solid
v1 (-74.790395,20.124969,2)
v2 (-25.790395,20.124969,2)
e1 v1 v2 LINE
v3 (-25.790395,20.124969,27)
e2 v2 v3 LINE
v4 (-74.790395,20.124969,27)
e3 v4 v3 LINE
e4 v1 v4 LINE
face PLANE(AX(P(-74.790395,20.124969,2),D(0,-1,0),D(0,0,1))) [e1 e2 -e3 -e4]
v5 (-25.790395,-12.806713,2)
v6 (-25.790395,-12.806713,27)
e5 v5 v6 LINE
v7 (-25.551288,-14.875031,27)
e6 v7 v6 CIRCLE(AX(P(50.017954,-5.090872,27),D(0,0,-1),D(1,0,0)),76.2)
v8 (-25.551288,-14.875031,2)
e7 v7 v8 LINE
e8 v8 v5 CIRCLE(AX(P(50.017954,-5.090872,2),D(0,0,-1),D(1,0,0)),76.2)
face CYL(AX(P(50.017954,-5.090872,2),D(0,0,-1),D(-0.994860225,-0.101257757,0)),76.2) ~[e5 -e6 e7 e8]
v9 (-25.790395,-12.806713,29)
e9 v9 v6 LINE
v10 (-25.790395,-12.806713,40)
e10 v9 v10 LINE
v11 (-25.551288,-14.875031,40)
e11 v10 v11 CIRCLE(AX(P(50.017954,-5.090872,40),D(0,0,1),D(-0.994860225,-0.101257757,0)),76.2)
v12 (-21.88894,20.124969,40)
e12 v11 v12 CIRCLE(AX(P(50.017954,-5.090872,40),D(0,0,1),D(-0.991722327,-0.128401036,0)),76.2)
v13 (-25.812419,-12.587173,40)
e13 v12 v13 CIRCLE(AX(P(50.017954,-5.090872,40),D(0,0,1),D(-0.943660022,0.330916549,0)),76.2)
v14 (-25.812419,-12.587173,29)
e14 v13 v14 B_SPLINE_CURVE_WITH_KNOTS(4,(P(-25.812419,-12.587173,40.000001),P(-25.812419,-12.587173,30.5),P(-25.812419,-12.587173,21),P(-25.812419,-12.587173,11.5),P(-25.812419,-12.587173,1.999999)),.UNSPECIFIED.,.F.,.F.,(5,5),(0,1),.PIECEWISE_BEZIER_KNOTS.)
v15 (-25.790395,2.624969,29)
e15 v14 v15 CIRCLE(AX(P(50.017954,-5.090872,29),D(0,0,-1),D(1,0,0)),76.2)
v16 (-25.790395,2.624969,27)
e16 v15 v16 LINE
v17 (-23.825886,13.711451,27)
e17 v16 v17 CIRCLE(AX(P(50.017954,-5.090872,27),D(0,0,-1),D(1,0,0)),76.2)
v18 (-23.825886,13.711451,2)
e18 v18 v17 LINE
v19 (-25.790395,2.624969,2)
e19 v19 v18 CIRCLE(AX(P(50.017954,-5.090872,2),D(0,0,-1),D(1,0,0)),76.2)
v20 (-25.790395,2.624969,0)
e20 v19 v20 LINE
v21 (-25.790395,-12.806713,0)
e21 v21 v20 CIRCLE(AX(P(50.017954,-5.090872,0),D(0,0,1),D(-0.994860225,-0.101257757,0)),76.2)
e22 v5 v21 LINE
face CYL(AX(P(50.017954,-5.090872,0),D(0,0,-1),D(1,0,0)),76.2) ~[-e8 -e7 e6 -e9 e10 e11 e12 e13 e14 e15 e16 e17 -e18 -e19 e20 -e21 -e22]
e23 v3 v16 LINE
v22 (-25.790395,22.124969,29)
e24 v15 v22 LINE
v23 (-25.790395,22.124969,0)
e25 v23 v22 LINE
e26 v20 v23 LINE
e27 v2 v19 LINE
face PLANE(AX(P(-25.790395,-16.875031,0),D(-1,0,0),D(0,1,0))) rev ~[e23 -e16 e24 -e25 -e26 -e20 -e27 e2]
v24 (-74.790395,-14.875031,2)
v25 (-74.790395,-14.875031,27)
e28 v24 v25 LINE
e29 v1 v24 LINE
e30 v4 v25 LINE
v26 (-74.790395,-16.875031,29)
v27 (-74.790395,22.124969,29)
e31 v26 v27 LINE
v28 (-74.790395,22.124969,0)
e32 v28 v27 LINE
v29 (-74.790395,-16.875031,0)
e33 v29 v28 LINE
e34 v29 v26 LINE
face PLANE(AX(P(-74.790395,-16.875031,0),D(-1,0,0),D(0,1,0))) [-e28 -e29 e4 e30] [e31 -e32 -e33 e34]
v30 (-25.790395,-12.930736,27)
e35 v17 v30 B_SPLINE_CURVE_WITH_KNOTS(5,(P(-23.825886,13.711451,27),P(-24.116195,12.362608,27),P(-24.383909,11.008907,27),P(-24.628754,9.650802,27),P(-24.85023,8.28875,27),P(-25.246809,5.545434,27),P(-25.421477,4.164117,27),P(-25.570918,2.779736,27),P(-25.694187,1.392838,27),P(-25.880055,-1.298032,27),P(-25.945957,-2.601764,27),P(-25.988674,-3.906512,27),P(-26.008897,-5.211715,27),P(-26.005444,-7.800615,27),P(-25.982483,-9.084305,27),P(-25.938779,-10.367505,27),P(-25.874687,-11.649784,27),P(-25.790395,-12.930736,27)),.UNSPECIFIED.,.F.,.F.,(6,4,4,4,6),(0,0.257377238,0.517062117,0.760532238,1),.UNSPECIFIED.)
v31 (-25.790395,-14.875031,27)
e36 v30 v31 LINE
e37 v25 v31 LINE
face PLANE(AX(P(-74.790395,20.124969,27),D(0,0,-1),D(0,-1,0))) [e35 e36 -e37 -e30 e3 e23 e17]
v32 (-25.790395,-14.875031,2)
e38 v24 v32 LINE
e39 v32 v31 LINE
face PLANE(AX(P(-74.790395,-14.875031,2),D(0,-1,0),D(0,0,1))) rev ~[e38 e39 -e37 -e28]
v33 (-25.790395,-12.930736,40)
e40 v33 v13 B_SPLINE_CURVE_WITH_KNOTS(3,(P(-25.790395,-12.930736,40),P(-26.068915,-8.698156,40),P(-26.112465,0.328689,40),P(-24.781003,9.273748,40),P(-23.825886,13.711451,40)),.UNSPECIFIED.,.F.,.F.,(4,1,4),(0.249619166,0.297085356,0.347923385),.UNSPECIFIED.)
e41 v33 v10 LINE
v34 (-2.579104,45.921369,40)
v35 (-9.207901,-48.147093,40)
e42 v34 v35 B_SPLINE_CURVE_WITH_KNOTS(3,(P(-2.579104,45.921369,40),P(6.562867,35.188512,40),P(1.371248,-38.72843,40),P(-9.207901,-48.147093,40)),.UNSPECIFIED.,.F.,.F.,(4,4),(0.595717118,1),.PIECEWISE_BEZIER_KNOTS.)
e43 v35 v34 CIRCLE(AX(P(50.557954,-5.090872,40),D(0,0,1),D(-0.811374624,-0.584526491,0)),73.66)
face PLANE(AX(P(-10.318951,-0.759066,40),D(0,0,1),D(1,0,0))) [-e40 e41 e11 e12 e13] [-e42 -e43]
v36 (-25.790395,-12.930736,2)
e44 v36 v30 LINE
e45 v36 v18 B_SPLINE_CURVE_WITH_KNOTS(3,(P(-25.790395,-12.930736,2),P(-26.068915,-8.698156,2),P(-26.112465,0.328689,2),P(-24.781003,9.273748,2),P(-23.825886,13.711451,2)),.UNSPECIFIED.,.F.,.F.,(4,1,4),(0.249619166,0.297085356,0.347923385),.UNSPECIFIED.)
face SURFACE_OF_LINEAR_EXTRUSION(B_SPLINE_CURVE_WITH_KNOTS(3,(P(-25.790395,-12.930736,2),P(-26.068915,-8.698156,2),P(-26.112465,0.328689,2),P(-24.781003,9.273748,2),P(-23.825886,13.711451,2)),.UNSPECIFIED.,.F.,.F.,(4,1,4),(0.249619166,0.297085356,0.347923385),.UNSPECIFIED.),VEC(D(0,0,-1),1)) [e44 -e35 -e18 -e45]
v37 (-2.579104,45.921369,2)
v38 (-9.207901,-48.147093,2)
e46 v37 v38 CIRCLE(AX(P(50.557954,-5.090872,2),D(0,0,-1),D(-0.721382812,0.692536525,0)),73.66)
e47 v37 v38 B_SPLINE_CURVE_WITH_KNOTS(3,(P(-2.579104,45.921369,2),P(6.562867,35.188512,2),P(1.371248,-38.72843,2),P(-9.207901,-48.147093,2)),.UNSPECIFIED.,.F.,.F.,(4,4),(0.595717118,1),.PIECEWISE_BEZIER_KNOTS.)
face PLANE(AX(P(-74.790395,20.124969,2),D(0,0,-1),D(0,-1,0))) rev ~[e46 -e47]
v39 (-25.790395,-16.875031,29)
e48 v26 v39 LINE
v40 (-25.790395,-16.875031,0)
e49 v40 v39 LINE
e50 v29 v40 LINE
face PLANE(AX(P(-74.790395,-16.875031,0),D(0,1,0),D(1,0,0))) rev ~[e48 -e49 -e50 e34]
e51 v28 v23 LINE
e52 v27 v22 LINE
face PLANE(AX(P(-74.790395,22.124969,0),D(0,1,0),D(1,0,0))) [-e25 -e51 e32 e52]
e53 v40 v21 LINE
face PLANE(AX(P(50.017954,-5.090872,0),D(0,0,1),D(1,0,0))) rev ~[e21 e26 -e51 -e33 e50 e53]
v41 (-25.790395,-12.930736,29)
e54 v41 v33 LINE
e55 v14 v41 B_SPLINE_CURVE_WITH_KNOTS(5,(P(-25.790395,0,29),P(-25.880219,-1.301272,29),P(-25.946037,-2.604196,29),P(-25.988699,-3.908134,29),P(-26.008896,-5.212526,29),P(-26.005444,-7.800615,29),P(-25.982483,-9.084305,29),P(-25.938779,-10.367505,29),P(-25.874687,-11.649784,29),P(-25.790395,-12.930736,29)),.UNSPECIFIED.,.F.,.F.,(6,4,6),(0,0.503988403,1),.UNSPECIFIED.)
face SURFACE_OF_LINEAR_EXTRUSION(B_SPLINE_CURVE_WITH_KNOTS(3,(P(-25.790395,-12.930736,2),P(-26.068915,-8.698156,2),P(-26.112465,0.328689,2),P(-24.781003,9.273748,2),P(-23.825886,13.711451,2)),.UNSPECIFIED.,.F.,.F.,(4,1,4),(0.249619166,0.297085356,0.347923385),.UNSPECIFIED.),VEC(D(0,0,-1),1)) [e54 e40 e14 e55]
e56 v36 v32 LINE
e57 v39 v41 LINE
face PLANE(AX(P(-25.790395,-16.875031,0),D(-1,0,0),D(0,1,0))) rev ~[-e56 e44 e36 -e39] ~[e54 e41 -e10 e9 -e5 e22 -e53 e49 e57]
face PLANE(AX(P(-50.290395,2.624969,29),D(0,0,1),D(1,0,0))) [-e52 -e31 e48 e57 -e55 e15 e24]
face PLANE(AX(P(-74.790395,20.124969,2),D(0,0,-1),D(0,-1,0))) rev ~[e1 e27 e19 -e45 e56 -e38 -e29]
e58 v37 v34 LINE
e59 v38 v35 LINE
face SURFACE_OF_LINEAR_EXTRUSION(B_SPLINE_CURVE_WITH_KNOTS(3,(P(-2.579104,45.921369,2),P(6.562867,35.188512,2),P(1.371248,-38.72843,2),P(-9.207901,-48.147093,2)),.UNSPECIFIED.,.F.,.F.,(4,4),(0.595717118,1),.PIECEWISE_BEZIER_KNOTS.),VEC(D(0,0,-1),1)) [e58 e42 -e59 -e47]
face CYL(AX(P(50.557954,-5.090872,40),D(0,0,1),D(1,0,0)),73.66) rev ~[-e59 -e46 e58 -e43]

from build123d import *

# Parameters (mm, degrees)
F0_W     = 49
F0_H     = 39
F1_DEPTH = 29
F3_R     = 76.2
F4_DEPTH = 40
F5_R     = 73.66
F6_DEPTH = 38
F2_W     = 35
F2_H     = 25
F7_DEPTH = 147.5
F9_DEPTH = 38


with BuildPart() as f1:
    # F0 (on Top) → F1 (new body)
    with BuildSketch(Plane.XY):
        with Locations((-50.2903954238, 2.6249693376)):
            Rectangle(F0_W, F0_H)
    extrude(amount=F1_DEPTH)

    # F3 (on Top) → F4 (join)
    with BuildSketch(Plane.XY):
        with Locations((50.0179536991, -5.090871723)):
            Circle(F3_R)
    extrude(amount=F4_DEPTH)

    # F5 (on face) → F6 (cut)
    with BuildSketch(Plane.XY.offset(40)):
        with Locations((50.5579536991, -5.090871723)):
            Circle(F5_R)
    extrude(amount=-F6_DEPTH, mode=Mode.SUBTRACT)

    # F2 (on face) → F7 (cut)
    with BuildSketch(Plane(origin=(-74.7903954238, 0, 0), x_dir=(0, -1, 0), z_dir=(-1, 0, 0))):
        with Locations((-2.6249693376, 14.5)):
            Rectangle(F2_W, F2_H)
    extrude(amount=-F7_DEPTH, mode=Mode.SUBTRACT)

    # F8 (on face) → F9 (join)
    with BuildSketch(Plane.XY.offset(2)):
        with BuildLine():
            ThreePointArc((-22.4493461678, -14.8750306624), (-17.8813273172, -32.3279863642), (-9.2079011268, -48.147093073))
            add(Edge.make_bspline(
                [(-2.5791042219, 45.9213687248), (6.562867427, 35.1885122385), (1.3712482781, -38.7284297831), (-9.2079011268, -48.147093073)],
                knots=[0.5957171177, 0.5957171177, 0.5957171177, 0.5957171177, 1, 1, 1, 1], degree=3))
            ThreePointArc((-2.5791042219, 45.9213687248), (-11.9603198587, 33.8611637996), (-18.6515612509, 20.1249693376))
            Line((-18.6515612509, 20.1249693376), (-21.8889399872, 20.1249693376))
            ThreePointArc((-21.8889399872, 20.1249693376), (-22.927932873, 16.9395080336), (-23.8258859148, 13.7114513007))
            add(Edge.make_bspline(
                [(-25.7903954238, -12.9307361878), (-26.0689147995, -8.6981558447), (-26.1124652464, 0.3286887969), (-24.7810032726, 9.273748372), (-23.8258859148, 13.7114513007)],
                knots=[0.2496191663, 0.2496191663, 0.2496191663, 0.2496191663, 0.2970853564, 0.3479233847, 0.3479233847, 0.3479233847, 0.3479233847], degree=3))
            Line((-25.7903954238, -12.9307361878), (-25.7903954238, -12.8067127836))
            ThreePointArc((-25.7903954238, -12.8067127836), (-25.6779062067, -13.8416884355), (-25.5512876221, -14.8750306624))
            Line((-25.5512876221, -14.8750306624), (-22.4493461678, -14.8750306624))
        make_face()
    extrude(amount=F9_DEPTH)


solid = f1.part
